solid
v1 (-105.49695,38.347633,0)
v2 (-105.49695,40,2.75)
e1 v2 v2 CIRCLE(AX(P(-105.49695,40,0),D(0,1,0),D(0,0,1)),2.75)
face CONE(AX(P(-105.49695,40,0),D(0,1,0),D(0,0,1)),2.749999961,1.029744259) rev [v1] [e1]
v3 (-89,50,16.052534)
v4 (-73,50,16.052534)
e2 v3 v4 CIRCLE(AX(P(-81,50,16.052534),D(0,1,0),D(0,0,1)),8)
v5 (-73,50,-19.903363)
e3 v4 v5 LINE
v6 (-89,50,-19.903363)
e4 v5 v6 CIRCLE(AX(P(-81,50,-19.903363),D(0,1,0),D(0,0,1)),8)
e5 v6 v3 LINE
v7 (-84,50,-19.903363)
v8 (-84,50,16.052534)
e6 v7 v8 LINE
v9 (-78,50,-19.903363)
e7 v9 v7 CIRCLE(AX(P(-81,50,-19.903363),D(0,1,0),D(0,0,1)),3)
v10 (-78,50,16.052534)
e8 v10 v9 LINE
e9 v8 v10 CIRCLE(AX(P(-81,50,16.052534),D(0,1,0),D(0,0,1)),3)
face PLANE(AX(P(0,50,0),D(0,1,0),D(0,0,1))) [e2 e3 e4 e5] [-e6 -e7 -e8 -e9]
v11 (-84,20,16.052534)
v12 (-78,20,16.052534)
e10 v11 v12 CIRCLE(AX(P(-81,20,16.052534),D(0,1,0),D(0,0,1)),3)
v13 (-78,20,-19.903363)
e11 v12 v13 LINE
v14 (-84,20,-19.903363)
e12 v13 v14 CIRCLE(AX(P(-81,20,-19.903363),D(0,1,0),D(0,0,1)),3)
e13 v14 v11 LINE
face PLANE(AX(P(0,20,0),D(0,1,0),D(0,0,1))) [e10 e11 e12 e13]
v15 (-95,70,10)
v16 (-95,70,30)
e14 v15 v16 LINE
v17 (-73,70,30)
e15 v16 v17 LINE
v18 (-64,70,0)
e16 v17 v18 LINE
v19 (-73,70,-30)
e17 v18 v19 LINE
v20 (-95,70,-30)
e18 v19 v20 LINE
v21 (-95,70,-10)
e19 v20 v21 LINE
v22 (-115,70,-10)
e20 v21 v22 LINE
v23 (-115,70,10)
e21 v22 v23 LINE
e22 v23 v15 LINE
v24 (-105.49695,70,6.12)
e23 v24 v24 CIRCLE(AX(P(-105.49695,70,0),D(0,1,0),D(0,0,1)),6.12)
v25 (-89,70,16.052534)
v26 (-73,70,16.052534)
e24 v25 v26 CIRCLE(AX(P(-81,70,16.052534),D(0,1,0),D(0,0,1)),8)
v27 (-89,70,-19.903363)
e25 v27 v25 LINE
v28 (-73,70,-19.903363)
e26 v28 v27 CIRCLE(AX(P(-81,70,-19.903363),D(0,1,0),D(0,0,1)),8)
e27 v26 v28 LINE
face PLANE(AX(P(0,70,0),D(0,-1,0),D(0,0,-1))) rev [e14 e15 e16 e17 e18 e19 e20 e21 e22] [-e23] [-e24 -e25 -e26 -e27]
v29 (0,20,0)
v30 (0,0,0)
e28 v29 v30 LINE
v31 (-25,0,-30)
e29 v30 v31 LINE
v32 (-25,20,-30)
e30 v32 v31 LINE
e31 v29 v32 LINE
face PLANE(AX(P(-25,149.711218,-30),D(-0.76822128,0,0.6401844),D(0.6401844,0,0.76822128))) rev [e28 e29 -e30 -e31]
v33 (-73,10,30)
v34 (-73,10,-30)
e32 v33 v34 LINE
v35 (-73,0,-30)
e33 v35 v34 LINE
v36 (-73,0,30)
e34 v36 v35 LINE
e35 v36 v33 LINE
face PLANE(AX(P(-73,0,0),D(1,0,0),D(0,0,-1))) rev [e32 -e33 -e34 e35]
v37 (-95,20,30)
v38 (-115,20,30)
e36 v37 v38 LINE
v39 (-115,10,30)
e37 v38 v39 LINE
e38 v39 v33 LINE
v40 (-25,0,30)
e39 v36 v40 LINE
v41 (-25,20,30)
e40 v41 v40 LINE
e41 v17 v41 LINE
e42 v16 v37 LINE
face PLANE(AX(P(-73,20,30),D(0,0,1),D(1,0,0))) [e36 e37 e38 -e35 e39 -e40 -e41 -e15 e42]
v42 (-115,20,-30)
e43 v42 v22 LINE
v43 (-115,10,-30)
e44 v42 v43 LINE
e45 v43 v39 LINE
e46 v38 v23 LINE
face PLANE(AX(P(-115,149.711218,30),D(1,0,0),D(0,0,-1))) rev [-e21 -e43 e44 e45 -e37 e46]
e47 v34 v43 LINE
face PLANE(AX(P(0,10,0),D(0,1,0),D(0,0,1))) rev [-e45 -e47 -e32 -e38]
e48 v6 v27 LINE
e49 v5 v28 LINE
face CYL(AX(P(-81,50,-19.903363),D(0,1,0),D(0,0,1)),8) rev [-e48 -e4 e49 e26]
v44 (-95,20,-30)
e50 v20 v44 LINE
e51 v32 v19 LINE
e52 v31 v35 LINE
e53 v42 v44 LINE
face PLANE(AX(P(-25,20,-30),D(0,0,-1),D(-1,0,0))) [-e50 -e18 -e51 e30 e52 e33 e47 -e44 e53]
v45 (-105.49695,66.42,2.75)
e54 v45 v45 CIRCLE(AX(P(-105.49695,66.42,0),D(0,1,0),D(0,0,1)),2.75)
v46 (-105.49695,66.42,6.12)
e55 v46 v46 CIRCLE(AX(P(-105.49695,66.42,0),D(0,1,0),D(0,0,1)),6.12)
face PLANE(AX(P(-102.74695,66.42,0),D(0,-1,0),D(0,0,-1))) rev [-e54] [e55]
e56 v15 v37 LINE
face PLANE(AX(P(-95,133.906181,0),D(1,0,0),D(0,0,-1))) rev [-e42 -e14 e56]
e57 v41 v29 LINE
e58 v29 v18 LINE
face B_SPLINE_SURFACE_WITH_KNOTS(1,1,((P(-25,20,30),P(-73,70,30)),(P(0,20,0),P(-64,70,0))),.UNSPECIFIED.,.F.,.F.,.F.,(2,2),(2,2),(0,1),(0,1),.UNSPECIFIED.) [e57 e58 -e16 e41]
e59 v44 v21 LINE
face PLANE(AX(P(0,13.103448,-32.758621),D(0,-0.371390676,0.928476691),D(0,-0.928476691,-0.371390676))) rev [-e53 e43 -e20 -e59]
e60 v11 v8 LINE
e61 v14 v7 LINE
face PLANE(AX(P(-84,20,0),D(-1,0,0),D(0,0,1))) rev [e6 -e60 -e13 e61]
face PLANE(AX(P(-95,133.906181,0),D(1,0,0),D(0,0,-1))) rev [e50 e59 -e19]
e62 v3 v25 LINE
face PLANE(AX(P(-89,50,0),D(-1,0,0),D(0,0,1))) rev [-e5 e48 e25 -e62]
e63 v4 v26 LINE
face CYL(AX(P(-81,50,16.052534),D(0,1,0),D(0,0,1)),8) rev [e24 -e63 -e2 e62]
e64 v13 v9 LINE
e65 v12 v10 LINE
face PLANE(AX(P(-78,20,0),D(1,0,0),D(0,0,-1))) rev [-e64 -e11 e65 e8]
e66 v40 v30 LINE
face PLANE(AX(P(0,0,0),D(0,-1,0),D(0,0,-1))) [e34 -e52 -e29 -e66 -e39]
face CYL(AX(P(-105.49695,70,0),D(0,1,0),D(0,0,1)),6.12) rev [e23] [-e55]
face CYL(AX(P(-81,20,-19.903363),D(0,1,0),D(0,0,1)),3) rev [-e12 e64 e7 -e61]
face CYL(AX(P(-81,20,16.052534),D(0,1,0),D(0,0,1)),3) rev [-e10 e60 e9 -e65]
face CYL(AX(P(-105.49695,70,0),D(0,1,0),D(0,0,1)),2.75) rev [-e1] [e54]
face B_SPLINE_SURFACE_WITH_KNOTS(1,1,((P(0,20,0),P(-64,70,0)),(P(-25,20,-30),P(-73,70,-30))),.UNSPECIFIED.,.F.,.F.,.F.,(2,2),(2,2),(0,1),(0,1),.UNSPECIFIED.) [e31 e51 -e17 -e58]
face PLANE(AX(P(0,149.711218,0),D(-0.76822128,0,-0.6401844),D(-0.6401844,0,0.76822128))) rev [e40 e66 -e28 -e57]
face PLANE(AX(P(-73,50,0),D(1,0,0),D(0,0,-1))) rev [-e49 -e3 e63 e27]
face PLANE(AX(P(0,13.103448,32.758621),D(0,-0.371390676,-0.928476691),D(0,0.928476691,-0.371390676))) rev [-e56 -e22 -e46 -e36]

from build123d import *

# Parameters (mm, degrees)
BOSS_EXTRUDE2_REACH                                  = 123.758
SKETCH4_119_W                                        = 22
SKETCH4_119_H                                        = 60
BOSS_EXTRUDE3_DEPTH                                  = 50
CUT_EXTRUDE1_DEPTH                                   = 20
CUT_EXTRUDE2_DEPTH                                   = 50
CUT_EXTRUDE3_START                                   = -10
SKETCH4_121_W                                        = 20
SKETCH4_121_H                                        = 60
SKETCH4_121_W_2                                      = 22
CUT_EXTRUDE3_DEPTH                                   = 10
CBORE_FOR_5_16_BINDING_HEAD_MACHINE_SCRE_D           = 5.499999922
CBORE_FOR_5_16_BINDING_HEAD_MACHINE_SCRE_DEPTH       = 30
CBORE_FOR_5_16_BINDING_HEAD_MACHINE_SCRE_CBORE_D     = 12.239999904
CBORE_FOR_5_16_BINDING_HEAD_MACHINE_SCRE_CBORE_DEPTH = 3.579999952
CBORE_FOR_5_16_BINDING_HEAD_MACHINE_SCRE_TIP         = 1.652366679


with BuildPart() as part:
    # Loft3: read off the stored shape, not the designer's step
    # Loft3: loft between two sections, ruled curve by curve
    loft3_from = [
        Edge.make_bspline([(-25, 20, 30), (0, 20, 0)], [0, 0, 1, 1], 1),
        Edge.make_bspline([(0, 20, 0), (-25, 20, -30)], [0, 0, 1, 1], 1),
        Edge.make_line((-73, 20, 30), (-25, 20, 30)),
        Edge.make_line((-25, 20, -30), (-73, 20, -30)),
        Edge.make_line((-73, 20, -30), (-73, 20, 30)),
    ]
    loft3_to = [
        Edge.make_bspline([(-73, 70, 30), (-64, 70, 0)], [0, 0, 1, 1], 1),
        Edge.make_bspline([(-64, 70, 0), (-73, 70, -30)], [0, 0, 1, 1], 1),
        Edge.make_line((-95, 70, 30), (-73, 70, 30)),
        Edge.make_line((-73, 70, -30), (-95, 70, -30)),
        Edge.make_line((-95, 70, -30), (-95, 70, 30)),
    ]
    loft3 = Solid(Shell([*[Face.make_surface_from_curves(loft3_from[k], loft3_to[k]) for k in range(5)], Face(Wire(loft3_from)), Face(Wire(loft3_to))]))
    add(loft3)

    # Boss-Extrude2: up to this face of the body (flat: up to its plane)
    boss_extrude2_end = Plane(part.part.faces().sort_by_distance((-42.319559229, 20, 0))[0])
    # Sketch1 → Boss-Extrude2 (add, up to the picked face)
    with BuildSketch(Plane(origin=(0, 0, 0), x_dir=(1, 0, 0), z_dir=(0, 1, 0)), mode=Mode.PRIVATE) as boss_extrude2_sk1:
        Polygon((-115, -30), (-115, 30), (-25, 30), (0, 0), (-25, -30), align=None)
    boss_extrude2_tool1 = split(extrude(boss_extrude2_sk1.sketch, amount=BOSS_EXTRUDE2_REACH, mode=Mode.PRIVATE), bisect_by=boss_extrude2_end, keep=Keep.BOTH, mode=Mode.PRIVATE)
    add(boss_extrude2_tool1.solids().sort_by(Axis((-63.495935, 0, 0), (0, 1, 0)))[0])

    # Sketch4 → Loft7 section 0
    with BuildSketch(Plane(origin=(0, 20, 0), x_dir=(1, 0, 0), z_dir=(0, 1, 0))):
        with BuildLine():
            Line((-73, -30), (-73, 30))
            Line((-73, 30), (-95, 30))
            Line((-95, 30), (-95, -30))
            Line((-95, -30), (-73, -30))
        make_face()
    # Sketch2<11> → Loft7 section 1
    with BuildSketch(Plane(origin=(0, 70, 0), x_dir=(1, 0, 0), z_dir=(0, 1, 0))):
        with BuildLine():
            Line((-115, 10), (-115, -10))
            Line((-115, -10), (-95, -10))
            Line((-95, -10), (-95, 10))
            Line((-95, 10), (-115, 10))
        make_face()
    loft()

    # Sketch2<14> → section 1 of loft9
    with BuildSketch(Plane(origin=(0, 70, 0), x_dir=(1, 0, 0), z_dir=(0, 1, 0)), mode=Mode.PRIVATE) as loft9_s1:
        with BuildLine():
            Line((-115, 10), (-115, -10))
            Line((-115, -10), (-95, -10))
            Line((-95, -10), (-95, 10))
            Line((-95, 10), (-115, 10))
        make_face()
    # loft from a face of the part (loft9)
    loft([part.faces().sort_by_distance((-105, 20, 0))[0], loft9_s1.sketch])

    # Sketch4<119> → Boss-Extrude3 (add)
    with BuildSketch(Plane(origin=(0, 20, 0), x_dir=(1, 0, 0), z_dir=(0, 1, 0))):
        with Locations((-84, 0)):
            Rectangle(SKETCH4_119_W, SKETCH4_119_H)
    extrude(amount=BOSS_EXTRUDE3_DEPTH)

    # Sketch2<8> → Cut-Extrude1 (cut)
    with BuildSketch(Plane(origin=(0, 70, 0), x_dir=(1, 0, 0), z_dir=(0, 1, 0))):
        with BuildLine():
            Line((-89, 19.903363007), (-89, -16.052534228))
            ThreePointArc((-89, -16.052534228), (-81, -24.052534228), (-73, -16.052534228))
            Line((-73, -16.052534228), (-73, 19.903363007))
            ThreePointArc((-73, 19.903363007), (-81, 27.903363007), (-89, 19.903363007))
        make_face()
        with BuildLine():
            ThreePointArc((-78, 19.903363007), (-81, 22.903363007), (-84, 19.903363007))
            Line((-84, 19.903363007), (-84, -16.052534228))
            ThreePointArc((-84, -16.052534228), (-81, -19.052534228), (-78, -16.052534228))
            Line((-78, -16.052534228), (-78, 19.903363007))
        make_face(mode=Mode.SUBTRACT)
    extrude(amount=-CUT_EXTRUDE1_DEPTH, mode=Mode.SUBTRACT)

    # Sketch2<13> → Cut-Extrude2 (cut)
    with BuildSketch(Plane(origin=(0, 70, 0), x_dir=(1, 0, 0), z_dir=(0, 1, 0))):
        with BuildLine():
            Line((-78, -16.052534228), (-78, 19.903363007))
            ThreePointArc((-78, 19.903363007), (-81, 22.903363007), (-84, 19.903363007))
            Line((-84, 19.903363007), (-84, -16.052534228))
            ThreePointArc((-84, -16.052534228), (-81, -19.052534228), (-78, -16.052534228))
        make_face()
    extrude(amount=-CUT_EXTRUDE2_DEPTH, mode=Mode.SUBTRACT)

    # Sketch4<121> → Cut-Extrude3 (cut)
    with BuildSketch(Plane(origin=(0, 20, 0), x_dir=(1, 0, 0), z_dir=(0, 1, 0)).offset(CUT_EXTRUDE3_START)):
        with Locations((-105, 0)):
            Rectangle(SKETCH4_121_W, SKETCH4_121_H)
        with Locations((-84, 0)):
            Rectangle(SKETCH4_121_W_2, SKETCH4_121_H)
    extrude(amount=-CUT_EXTRUDE3_DEPTH, mode=Mode.SUBTRACT)

    # CBORE for 5/16 Binding Head Machine Screw1
    with Locations(Plane(origin=(0, 70, 0), x_dir=(1, 0, 0), z_dir=(0, 1, 0))):
        with Locations((-105.496950166, 0)):
            CounterBoreHole(CBORE_FOR_5_16_BINDING_HEAD_MACHINE_SCRE_D / 2, CBORE_FOR_5_16_BINDING_HEAD_MACHINE_SCRE_CBORE_D / 2, CBORE_FOR_5_16_BINDING_HEAD_MACHINE_SCRE_CBORE_DEPTH, depth=CBORE_FOR_5_16_BINDING_HEAD_MACHINE_SCRE_DEPTH)
            with Locations((0, 0, -(CBORE_FOR_5_16_BINDING_HEAD_MACHINE_SCRE_DEPTH + CBORE_FOR_5_16_BINDING_HEAD_MACHINE_SCRE_TIP / 2))):  # 118° drill point
                Cone(0, CBORE_FOR_5_16_BINDING_HEAD_MACHINE_SCRE_D / 2, CBORE_FOR_5_16_BINDING_HEAD_MACHINE_SCRE_TIP, mode=Mode.SUBTRACT)


solid = part.part
